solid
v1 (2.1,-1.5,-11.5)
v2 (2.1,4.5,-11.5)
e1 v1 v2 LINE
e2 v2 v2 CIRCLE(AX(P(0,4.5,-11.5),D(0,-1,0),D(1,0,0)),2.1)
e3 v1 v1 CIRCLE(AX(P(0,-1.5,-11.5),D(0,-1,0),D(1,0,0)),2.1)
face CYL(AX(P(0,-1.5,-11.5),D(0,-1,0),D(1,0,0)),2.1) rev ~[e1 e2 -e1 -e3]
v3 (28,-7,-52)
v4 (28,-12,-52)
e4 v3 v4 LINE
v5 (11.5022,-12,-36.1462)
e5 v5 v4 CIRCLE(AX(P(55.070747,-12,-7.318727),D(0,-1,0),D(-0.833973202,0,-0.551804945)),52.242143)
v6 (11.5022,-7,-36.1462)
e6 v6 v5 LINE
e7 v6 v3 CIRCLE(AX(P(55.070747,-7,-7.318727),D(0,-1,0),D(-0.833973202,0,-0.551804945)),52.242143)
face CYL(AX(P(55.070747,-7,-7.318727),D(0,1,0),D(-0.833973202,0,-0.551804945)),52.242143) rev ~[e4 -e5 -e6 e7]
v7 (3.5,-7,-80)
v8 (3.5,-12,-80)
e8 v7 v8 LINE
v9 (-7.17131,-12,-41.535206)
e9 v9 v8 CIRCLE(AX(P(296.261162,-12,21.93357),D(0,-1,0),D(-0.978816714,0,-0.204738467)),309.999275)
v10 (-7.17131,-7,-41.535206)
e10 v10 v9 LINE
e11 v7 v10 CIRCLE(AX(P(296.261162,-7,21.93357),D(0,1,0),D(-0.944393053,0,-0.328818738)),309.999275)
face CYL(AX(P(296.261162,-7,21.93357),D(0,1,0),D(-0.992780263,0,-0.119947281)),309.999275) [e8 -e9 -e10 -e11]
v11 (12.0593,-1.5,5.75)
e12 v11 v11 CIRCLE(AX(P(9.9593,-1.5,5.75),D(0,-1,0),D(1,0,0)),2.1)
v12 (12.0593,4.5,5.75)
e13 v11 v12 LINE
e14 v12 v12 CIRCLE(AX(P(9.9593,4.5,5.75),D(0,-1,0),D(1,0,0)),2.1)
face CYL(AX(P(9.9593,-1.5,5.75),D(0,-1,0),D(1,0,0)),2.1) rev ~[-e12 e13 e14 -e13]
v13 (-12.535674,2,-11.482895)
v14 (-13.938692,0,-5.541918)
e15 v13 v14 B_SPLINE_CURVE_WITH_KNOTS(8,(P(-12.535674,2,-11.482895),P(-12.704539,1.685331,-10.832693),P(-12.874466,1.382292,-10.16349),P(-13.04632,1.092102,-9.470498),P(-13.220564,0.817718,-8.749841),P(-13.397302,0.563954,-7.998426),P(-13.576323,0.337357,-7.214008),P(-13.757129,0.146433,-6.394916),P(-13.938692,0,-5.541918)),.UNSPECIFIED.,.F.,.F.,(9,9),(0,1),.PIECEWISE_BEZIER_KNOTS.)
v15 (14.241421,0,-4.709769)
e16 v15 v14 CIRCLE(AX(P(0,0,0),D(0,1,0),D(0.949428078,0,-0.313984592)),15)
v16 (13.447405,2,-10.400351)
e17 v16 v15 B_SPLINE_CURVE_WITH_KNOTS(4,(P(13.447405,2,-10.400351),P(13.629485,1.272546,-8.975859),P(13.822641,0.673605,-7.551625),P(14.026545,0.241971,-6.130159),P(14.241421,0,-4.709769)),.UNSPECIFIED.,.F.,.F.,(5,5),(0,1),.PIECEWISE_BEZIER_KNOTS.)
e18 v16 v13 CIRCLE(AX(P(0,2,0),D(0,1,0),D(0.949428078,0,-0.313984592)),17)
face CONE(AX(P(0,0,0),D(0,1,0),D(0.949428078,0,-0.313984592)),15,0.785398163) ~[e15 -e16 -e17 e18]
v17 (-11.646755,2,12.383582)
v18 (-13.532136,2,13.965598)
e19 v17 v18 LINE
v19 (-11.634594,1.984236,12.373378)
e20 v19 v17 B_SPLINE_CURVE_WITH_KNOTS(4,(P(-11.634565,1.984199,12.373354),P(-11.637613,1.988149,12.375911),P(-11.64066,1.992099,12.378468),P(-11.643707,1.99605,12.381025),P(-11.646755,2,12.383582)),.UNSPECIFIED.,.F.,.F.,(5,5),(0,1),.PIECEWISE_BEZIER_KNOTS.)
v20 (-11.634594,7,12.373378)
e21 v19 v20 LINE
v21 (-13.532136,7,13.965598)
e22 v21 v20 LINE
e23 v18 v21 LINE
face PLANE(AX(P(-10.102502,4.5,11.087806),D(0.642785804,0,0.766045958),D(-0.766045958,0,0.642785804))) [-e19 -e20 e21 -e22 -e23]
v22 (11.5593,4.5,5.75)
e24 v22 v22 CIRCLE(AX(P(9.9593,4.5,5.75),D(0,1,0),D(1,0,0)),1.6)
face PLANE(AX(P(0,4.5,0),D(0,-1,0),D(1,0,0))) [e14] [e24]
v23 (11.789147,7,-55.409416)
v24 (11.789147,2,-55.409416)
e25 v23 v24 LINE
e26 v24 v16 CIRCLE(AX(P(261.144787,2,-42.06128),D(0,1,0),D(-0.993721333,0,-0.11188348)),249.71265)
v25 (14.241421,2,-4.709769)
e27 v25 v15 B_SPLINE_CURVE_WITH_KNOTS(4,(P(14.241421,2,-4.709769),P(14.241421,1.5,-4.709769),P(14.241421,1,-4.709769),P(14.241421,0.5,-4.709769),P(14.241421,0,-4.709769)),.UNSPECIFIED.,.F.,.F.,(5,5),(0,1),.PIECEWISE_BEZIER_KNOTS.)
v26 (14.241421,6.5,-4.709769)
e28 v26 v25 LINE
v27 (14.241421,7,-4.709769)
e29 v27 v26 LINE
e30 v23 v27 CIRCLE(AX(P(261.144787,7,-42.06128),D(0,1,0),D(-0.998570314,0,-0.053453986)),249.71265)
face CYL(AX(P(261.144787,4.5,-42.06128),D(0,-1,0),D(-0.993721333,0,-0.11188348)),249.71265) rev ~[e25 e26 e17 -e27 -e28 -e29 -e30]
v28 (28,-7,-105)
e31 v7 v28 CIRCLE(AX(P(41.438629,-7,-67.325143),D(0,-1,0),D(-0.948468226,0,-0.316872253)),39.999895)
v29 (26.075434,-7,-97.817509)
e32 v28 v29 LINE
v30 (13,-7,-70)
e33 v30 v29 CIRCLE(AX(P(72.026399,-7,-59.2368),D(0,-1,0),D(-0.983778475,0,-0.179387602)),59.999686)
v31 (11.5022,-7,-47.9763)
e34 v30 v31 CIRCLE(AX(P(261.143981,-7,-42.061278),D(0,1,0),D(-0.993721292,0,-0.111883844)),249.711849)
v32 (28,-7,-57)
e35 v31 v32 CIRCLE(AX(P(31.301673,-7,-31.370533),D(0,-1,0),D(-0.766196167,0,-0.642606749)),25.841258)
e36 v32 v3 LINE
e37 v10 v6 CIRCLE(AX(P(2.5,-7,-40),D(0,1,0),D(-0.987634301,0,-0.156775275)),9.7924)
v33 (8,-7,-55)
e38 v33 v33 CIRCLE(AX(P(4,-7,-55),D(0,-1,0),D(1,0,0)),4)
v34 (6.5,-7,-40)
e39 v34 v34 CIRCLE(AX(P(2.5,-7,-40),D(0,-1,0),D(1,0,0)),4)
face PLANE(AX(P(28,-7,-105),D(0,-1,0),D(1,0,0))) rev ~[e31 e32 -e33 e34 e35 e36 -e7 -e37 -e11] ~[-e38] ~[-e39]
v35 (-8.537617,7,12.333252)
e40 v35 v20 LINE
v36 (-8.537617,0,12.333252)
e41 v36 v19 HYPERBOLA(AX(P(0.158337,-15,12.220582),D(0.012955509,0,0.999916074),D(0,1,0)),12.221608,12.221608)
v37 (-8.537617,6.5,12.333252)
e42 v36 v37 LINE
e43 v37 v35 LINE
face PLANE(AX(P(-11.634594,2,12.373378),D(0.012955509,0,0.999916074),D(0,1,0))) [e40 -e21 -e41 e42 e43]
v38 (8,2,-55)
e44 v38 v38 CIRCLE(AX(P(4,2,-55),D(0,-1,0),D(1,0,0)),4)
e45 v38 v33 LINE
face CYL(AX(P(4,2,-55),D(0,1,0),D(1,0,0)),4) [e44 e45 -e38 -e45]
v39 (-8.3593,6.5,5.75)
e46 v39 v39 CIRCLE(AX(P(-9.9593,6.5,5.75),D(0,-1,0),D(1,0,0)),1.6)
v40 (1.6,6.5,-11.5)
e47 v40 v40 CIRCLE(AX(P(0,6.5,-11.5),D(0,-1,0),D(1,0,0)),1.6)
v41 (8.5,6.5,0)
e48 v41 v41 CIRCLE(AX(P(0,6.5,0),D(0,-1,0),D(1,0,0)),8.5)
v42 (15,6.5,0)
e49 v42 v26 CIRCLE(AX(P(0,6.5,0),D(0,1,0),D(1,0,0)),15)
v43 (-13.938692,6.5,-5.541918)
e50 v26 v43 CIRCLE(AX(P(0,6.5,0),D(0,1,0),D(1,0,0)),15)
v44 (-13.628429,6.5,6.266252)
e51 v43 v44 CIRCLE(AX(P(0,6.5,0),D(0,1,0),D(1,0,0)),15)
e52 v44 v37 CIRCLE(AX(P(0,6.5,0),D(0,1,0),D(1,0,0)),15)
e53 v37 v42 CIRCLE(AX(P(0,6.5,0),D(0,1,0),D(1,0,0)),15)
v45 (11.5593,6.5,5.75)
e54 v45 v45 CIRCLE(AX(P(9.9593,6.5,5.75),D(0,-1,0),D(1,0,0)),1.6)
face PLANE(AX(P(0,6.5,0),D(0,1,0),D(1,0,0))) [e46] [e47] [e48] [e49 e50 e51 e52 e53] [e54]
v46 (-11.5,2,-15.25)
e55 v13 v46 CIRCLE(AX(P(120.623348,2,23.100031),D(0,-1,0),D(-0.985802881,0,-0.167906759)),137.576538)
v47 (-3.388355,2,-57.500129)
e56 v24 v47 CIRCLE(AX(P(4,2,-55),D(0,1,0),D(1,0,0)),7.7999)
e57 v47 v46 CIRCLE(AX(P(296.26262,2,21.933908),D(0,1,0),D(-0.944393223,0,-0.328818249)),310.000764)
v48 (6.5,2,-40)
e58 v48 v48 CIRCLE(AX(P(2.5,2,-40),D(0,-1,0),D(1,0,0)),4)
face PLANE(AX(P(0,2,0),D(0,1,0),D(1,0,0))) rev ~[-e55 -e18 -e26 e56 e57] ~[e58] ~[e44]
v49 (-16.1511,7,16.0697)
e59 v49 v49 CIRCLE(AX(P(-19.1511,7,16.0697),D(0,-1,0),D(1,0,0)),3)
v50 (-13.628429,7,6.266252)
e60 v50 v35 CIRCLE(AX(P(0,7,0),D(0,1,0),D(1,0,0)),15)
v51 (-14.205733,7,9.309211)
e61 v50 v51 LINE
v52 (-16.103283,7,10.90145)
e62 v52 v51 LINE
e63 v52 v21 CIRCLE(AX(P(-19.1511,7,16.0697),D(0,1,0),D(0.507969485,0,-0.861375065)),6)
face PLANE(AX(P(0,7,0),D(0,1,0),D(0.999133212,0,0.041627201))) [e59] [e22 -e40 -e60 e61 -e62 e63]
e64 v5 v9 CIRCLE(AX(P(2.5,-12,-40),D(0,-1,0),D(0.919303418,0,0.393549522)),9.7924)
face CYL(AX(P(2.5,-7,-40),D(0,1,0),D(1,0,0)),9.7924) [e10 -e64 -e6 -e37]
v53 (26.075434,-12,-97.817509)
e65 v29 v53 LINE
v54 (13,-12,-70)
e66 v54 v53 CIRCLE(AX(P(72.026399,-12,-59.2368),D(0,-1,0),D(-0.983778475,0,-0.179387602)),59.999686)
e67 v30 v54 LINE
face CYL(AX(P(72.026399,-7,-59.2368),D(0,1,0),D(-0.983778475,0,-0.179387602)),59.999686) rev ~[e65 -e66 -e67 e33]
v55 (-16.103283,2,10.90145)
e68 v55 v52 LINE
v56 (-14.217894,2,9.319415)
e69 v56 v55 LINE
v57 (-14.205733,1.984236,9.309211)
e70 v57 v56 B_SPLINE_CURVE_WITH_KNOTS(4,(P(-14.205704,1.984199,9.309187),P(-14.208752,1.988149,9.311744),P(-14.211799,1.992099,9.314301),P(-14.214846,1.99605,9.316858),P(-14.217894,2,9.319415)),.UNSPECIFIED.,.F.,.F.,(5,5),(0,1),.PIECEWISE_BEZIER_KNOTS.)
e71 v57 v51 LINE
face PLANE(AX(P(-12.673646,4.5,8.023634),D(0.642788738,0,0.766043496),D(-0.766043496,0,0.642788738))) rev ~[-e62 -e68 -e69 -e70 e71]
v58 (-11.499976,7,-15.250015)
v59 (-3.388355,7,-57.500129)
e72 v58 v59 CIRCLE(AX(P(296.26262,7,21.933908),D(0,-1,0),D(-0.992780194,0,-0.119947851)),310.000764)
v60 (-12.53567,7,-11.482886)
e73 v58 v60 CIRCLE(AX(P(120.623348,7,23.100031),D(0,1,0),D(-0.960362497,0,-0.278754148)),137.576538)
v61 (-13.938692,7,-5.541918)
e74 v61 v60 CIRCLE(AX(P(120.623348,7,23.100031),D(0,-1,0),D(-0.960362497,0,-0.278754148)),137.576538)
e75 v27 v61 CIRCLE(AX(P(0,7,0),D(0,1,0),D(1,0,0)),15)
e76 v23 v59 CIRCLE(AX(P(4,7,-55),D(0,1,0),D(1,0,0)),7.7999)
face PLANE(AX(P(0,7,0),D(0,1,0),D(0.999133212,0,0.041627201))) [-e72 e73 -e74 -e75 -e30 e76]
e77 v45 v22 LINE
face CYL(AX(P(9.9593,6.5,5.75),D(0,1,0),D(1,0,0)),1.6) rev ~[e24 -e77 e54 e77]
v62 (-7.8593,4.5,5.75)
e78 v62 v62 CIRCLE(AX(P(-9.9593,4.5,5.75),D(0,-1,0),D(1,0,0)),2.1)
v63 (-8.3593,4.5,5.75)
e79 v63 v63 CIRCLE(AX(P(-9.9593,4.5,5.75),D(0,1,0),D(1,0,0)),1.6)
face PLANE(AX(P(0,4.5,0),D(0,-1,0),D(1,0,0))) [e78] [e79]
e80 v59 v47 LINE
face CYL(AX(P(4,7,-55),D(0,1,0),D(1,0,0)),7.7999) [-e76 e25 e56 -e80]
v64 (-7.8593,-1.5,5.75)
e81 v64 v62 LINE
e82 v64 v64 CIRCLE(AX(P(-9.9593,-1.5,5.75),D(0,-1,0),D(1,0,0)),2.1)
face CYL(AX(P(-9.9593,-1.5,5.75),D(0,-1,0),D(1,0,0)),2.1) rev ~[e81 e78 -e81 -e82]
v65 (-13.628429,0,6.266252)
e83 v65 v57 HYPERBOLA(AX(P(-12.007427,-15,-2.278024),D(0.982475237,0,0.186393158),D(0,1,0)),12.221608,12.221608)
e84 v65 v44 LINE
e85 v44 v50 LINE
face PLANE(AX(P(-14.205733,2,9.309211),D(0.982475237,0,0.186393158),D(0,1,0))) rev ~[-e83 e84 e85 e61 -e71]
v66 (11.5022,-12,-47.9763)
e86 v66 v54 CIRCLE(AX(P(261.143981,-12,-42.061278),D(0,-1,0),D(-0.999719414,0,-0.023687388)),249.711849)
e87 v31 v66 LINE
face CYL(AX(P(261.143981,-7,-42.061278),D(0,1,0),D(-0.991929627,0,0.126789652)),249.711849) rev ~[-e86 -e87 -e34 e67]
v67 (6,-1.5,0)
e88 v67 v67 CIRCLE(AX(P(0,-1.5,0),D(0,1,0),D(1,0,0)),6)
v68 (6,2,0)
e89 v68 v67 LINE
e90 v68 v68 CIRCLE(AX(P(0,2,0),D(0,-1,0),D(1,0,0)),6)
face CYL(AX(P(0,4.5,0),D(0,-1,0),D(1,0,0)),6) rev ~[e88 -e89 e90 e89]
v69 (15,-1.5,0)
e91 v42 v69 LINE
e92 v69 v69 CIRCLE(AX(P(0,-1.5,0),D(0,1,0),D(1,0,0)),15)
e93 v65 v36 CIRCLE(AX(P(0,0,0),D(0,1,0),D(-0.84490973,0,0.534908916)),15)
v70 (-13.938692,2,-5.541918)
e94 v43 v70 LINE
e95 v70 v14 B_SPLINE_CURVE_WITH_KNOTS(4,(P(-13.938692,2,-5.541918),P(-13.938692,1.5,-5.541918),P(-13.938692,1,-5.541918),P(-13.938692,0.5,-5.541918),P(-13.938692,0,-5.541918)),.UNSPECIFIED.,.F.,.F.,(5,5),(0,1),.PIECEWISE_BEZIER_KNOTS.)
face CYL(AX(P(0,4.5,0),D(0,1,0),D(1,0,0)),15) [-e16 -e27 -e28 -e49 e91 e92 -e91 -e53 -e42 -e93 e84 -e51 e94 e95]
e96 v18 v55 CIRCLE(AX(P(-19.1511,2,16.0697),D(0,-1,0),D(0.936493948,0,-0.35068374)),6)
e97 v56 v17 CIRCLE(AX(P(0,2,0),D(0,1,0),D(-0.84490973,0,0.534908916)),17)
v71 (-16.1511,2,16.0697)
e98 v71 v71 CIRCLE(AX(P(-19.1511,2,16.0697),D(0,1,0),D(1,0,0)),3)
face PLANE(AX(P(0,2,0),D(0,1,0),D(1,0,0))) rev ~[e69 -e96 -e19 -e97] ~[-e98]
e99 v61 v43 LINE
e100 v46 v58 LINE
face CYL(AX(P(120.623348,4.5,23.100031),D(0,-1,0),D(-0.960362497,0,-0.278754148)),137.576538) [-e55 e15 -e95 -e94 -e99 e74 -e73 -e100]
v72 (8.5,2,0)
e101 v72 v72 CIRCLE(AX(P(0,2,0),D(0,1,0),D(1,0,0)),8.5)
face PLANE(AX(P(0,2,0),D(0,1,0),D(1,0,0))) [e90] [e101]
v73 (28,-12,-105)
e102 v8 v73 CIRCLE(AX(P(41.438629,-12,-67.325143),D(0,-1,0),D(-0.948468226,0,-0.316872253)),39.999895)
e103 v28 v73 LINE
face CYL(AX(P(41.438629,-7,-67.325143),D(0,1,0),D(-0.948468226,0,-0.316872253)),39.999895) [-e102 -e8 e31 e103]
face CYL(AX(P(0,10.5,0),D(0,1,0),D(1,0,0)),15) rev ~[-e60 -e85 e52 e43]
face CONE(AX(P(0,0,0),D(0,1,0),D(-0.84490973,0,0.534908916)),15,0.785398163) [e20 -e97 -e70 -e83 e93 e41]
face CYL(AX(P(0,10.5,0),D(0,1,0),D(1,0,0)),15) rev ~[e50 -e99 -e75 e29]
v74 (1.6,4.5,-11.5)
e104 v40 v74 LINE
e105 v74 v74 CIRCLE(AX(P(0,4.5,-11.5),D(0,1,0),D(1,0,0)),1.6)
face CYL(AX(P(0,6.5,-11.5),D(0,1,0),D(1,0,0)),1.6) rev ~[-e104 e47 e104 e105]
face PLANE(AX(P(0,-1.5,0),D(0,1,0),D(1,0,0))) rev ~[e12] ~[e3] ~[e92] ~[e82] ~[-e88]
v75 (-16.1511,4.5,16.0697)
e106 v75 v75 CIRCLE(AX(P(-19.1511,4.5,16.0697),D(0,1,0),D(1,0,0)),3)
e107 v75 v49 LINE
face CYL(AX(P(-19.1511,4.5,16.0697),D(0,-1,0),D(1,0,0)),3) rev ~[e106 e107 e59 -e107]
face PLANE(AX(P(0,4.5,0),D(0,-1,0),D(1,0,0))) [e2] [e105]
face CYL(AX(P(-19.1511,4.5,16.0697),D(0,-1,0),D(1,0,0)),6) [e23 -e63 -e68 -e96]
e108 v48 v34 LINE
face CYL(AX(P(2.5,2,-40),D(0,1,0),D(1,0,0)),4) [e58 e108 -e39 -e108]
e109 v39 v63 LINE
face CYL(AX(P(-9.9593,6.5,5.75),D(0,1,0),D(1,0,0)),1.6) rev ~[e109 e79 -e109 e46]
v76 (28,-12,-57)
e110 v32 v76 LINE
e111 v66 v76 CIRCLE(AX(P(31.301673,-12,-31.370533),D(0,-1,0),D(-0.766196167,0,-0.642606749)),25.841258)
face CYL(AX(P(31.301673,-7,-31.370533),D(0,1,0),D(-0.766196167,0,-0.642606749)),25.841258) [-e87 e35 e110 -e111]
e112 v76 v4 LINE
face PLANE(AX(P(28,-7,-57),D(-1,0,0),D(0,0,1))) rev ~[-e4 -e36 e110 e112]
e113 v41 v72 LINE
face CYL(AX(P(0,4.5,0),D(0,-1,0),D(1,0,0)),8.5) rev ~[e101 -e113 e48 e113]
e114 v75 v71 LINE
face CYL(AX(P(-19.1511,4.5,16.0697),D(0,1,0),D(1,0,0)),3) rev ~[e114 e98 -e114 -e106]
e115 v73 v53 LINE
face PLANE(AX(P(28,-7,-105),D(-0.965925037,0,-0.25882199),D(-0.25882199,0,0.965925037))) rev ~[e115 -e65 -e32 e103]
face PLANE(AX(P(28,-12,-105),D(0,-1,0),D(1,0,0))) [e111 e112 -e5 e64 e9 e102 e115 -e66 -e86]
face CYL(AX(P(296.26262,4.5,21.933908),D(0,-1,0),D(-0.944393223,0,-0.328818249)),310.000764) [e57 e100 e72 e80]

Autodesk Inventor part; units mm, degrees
sketch "Skizze10" plane through (0, 0, 0) normal (1, 0, 0) x (0, 1, 0)
  line L0 (-1.4, 0) -> (8.4, 0) projected
  line L1 (0, -13.2) -> (0, 2.2) projected
  line L2 (2, -2.5) -> (7, -2.5)
  line L3 (7, -2.5) -> (7, -8)
  line L4 (7, -8) -> (2, -8)
  line L5 (2, -8) -> (2, -2.5)
  point P0 (0, 0)
  point P1 (0, -11)
  dimension "d135" = 8
  dimension "d137" = 5
  dimension "d138" = 2
  dimension "d145" = 2.5
revolve "Umdrehung2" add sketch "Skizze10" angle 360 about axis through (0, -10, 0) along (0, 1, 0)
ref_plane "Arbeitsebene2" through (0, 6, 0) normal (0, 1, 0) x (1, 0, 0)
ref_plane "Arbeitsebene3" through (0, 4.5, 0) normal (0, 1, 0) x (1, 0, 0)
sketch "Skizze12" plane through (0, 4.5, 0) normal (0, 1, 0) x (1, 0, 0)
  arc A0 (3.5, 80) -> (-11.5, 15.25) centre (296.2619, -21.9337) ccw projected
  arc A1 (28, 100) -> (13, 70) centre (72.0267, 59.2367) ccw projected
  line L0 (28, 100) -> (28, 105) projected
  arc A2 (28, 105) -> (3.5, 80) centre (41.4387, 67.3251) ccw projected
  circle A3 centre (0, 0) radius 15
  arc A4 (13, 70) -> (15, 0) centre (261.1443, 42.0613) ccw
  arc A5 (-11.5, 15.25) -> (-15, 0) centre (120.624, -23.1002) ccw
  circle A6 centre (0, 0) radius 8 projected
  line L1 (0, 0) -> (-19.1511, -16.0697)
  line L2 (-78.9324, 0) -> (358.7942, 0) projected
  line L3 (0, 133.8507) -> (0, -48.3491) projected
  circle A7 centre (-19.1511, -16.0697) radius 6
  circle A8 centre (-19.1511, -16.0697) radius 3
  line L4 (1.2856, -1.5321) -> (-14.0353, -14.3878)
  line L5 (-1.2856, 1.5321) -> (-16.6065, -11.3237)
  point P0 (-16.4, 0)
  point P1 (-12.6736, -8.0236)
  point P2 (-16.1033, -10.9014)
  point P3 (-13.5321, -13.9656)
  point P4 (-10.1025, -11.0878)
  dimension "d147" = 30
  dimension "d148" = 50
  dimension "d149" = 25
  dimension "d150" = 12
  dimension "d152" = 3
  dimension "d153" = 2
  dimension "d154" = 2
sketch "Skizze13" plane through (0, 4.5, 0) normal (0, 1, 0) x (1, 0, 0)
  point P0 (0, 0)
extrude "Extrusion8" add sketch "Skizze12" along normal mid plane 5 contours A2 L0 A1 A4 A3 L3 A0 | L3 A3 A5 A0 | L3 A6 L2 A5 A3 | A3 A4 L2 A6 L3 | L3 L2 A6 | A6 L2 L3 | L2 A6 L5 A3 | A3 L3 A6 L2 | A6 L3 L2 | L2 L5 A6 | L3 L4 A6 L1 | L1 A6 L5 L2 | L5 A6 L1 A3 | A3 L1 A7 L5 | A3 L4 A6 L3 | A6 L4 L3 | A6 L4 A3 L1 | A3 L4 A7 L1 | A7
sketch "Skizze14" plane through (0, 4.5, 0) normal (0, 1, 0) x (1, 0, 0)
  circle A0 centre (0, 0) radius 2.5
  dimension "d157" = 5
extrude "Extrusion9" cut sketch "Skizze14" along normal mid plane 20
sketch "Skizze15" plane through (0, 4.5, 0) normal (0, 1, 0) x (1, 0, 0)
  arc A0 (-11.5, 15.25) -> (-15, 0) centre (120.624, -23.1002) ccw projected
  circle A1 centre (0, 0) radius 15
extrude "Extrusion10" add sketch "Skizze15" along normal mid plane 12
sketch "Skizze16" plane through (0, 4.5, 0) normal (0, 1, 0) x (1, 0, 0)
  circle A0 centre (0, 0) radius 6
  dimension "d162" = 12
extrude "Extrusion11" cut sketch "Skizze16" along normal mid plane 12
sketch "Skizze17" plane through (0, 4.5, 0) normal (0, 1, 0) x (1, 0, 0)
  circle A0 centre (0, 0) radius 8.5
  dimension "d165" = 17
extrude "Extrusion12" cut sketch "Skizze17" along normal mid plane 5
chamfer "Fasen7" distance 2 angle 45 8 edges at (-11.4907, 7, 9.6418) (-10.1025, 5.75, 11.0878) (-10.1025, 3.25, 11.0878) (-11.4907, 2, 9.6418) (0.4428, 2, -14.9935) (0.4428, 7, -14.9935) (-12.6736, 5.75, 8.0236) (-12.6736, 3.25, 8.0236)
sketch "Skizze18" plane through (28, 2, -105) normal (0, -1, 0) x (1, 0, 0)
  point P0 (-28, 105)
ref_plane "Arbeitsebene4" through (28, -7, -105) normal (0, -1, 0) x (1, 0, 0)
sketch "Skizze20" plane through (28, 2, -105) normal (0, -1, 0) x (1, 0, 0)
  circle A0 centre (-24, 50) radius 4
  circle A1 centre (-25.5, 65) radius 4
  point P0 (-28, 105)
  dimension "d188" = 8
  dimension "d189" = 8
  dimension "d192" = 1.5
  dimension "d193" = 15
extrude "Extrusion14" add sketch "Skizze20" along normal blind 9
sketch "Skizze19" plane through (28, -7, -105) normal (0, -1, 0) x (1, 0, 0)
  arc A0 (-24.5, 25) -> (0, 0) centre (13.4387, 37.6749) ccw projected
  arc A1 (-15, 35) -> (0, 5) centre (44.0267, 45.7633) ccw projected
  line L0 (0, 0) -> (0, 5) projected
  line L1 (-15, 35) -> (-24.5, 25)
  arc A2 (-39.5, 89.75) -> (-24.5, 25) centre (268.2619, 126.9337) ccw projected
  arc A3 (-14.5526, 94.5996) -> (-15, 35) centre (233.1443, 62.9387) ccw projected
  line L2 (-27, 80) -> (3, 80) construction
  line L3 (-27, 80) -> (-7, 80) construction
  line L4 (-27, 82.5) -> (-5.7868, 82.5) construction
  circle A4 centre (-27, 80) radius 4 projected
  circle A5 centre (-27, 80) radius 4 projected
  circle A6 centre (-27, 60) radius 2.5 projected
  circle A7 centre (-27, 60) radius 2.5 projected
  circle A8 centre (-25.5, 65) radius 4 projected
  circle A9 centre (-25.5, 65) radius 9.7924
  arc A10 (-24.5, 73) -> (-16.5398, 59.1931) centre (13.4387, 85.6749) ccw
  line L5 (0, 48) -> (0, 53)
  line L6 (-28, -28.8006) -> (-28, 153.0481) projected
  line L7 (-117.4337, 105) -> (332.5445, 105) projected
  line L8 (0, 0) -> (0, 105)
  line L9 (0, 105) -> (0, 48)
  line L10 (0, 48) -> (-45.6316, 48)
  arc A11 (-16.4978, 68.8538) -> (0, 53) centre (27.0703, 97.6809) ccw
  arc A12 (-16.4978, 57.0237) -> (0, 48) centre (3.3017, 73.6295) ccw
  line L11 (0, 0) -> (-3.8553, 14.388)
  point P0 (-28, 105)
  point P1 (-16.5679, 62.8977)
  point P2 (-37.8031, 77.6969)
  point P3 (-16.4978, 68.8538)
  point P4 (-35.1713, 63.4649)
  point P5 (-15.4874, 86.1429)
  point P6 (-16.5398, 59.1931)
  point P7 (-1.9245, 7.1825)
  dimension "d213" = 57
  dimension "d214" = 15
extrude "Extrusion13" add sketch "Skizze19" along normal blind 5 contours L1 A1 L11 A0 | A2 L6 L10 A3 L1 | A2 L10 L6 | L10 L6 A9 A10 A3 | A2 A9 L6 L10 | A12 A3 A9 A11 L5 | A2 A9 L6 A8 A6 | L6 A6 A8 A9 A3 | A10 A9 A3 | L6 A8 A6 | A6 A8 L6 | A9 A3 | A8 L6 A6 | A6 L6 A8 | L6 A6 A8 | A8 A6 L6
sketch "Skizze21" plane through (28, 7, -100) normal (0, 1, 0) x (1, 0, 0)
  circle A0 centre (-24, -45) radius 4 projected
  circle A1 centre (-25.5, -60) radius 4 projected
  circle A2 centre (-27, -75) radius 4 projected
  circle A3 centre (-24, -45) radius 7.7999
  arc A4 (-14.5526, -89.5996) -> (-40.5357, -88.5171) centre (-28, -100) ccw projected
  arc A5 (-15, -30) -> (-14.5526, -89.5996) centre (233.1443, -57.9387) ccw projected
  arc A6 (0, 0) -> (-15, -30) centre (44.0267, -40.7633) ccw projected
  line L0 (0, 0) -> (0, 5) projected
  arc A7 (0, 5) -> (-24.5, -20) centre (13.4387, -32.6749) ccw projected
  arc A8 (-24.5, -20) -> (-39.5, -84.75) centre (268.2619, -121.9337) ccw projected
  arc A9 (-39.5, -84.75) -> (-40.5357, -88.5171) centre (92.624, -123.1002) ccw projected
  point P0 (-31.3884, -42.5)
  point P1 (-16.2109, -44.5906)
extrude "Extrusion15" cut sketch "Skizze21" against normal blind 5 contours A3 A8 A7 L0 A6 A5
sketch "Skizze22" plane through (0, 10.5, 0) normal (0, 1, 0) x (1, 0, 0)
  circle A0 centre (0, 0) radius 15
extrude "Extrusion16" cut sketch "Skizze22" against normal blind 4
sketch "Skizze23" plane through (0, 6.5, 0) normal (0, 1, 0) x (1, 0, 0)
  circle A0 centre (0, 0) radius 11.5
  circle A1 centre (0, 0) radius 8.5 projected
  arc A2 (-8.5376, -12.3333) -> (14.2414, 4.7098) centre (0, 0) ccw projected
  arc A3 (14.2414, 4.7098) -> (-13.9387, 5.5419) centre (0, 0) ccw projected
  arc A4 (-13.9387, 5.5419) -> (-13.6284, -6.2663) centre (0, 0) ccw projected
  arc A5 (-13.6284, -6.2663) -> (-8.5376, -12.3333) centre (0, 0) ccw projected
  line L0 (0, 0) -> (0, 30.1183)
  line L1 (0, 0) -> (-26.0832, -15.0591)
  line L2 (0, 0) -> (26.0832, -15.0591)
  circle A6 centre (-9.9593, -5.75) radius 1.6
  circle A7 centre (9.9593, -5.75) radius 1.6
  circle A8 centre (0, 11.5) radius 1.6
  dimension "d198" = 3
  dimension "d201" = 360
  dimension "d203" = 3.2
  dimension "d204" = 3.2
  dimension "d205" = 3.2
  dimension "d210" = 23
extrude "Extrusion17" cut sketch "Skizze23" against normal blind 8 contours A8 L0 A0 | A0 L0 A8 | A7 L2 A0 | A0 L2 A7 | L0 A8 A0 | A0 A8 L0 | L2 A7 A0 | A0 A7 L2 | A6 L1 A0 | A0 L1 A6 | A6 L1 A0 | A0 L1 A6
sketch "Skizze24" plane through (0, 7, 0) normal (0, 1, 0) x (0.9991332, 0, 0.0416272)
  arc A0 (-5.779, 57.3091) -> (-12.1248, 14.7581) centre (296.9181, -9.5822) ccw projected
  arc A1 (-12.1248, 14.7581) -> (-13.0028, 10.9511) centre (121.481, -18.0589) ccw projected
  arc A2 (13.0028, 10.9511) -> (-13.0028, 10.9511) centre (0, 0) ccw projected
  arc A3 (9.4724, 55.8521) -> (13.0028, 10.9511) centre (259.167, 52.8955) ccw projected
  line L0 (41.2501, 29.7308) -> (-28.4254, 29.7308)
  line L1 (-28.4254, 29.7308) -> (-28.4254, -36.8887)
  line L2 (-28.4254, -36.8887) -> (41.2501, -36.8887)
  line L3 (41.2501, -36.8887) -> (41.2501, 29.7308)
  point P0 (-10.579, 29.7308)
  point P1 (10.5316, 29.7308)
extrude "Extrusion18" cut sketch "Skizze24" along normal blind 5 contours A0 A1 A2 A3 L0 L3 L2 L1
sketch "Skizze26" plane through (0, -1.5, 0) normal (0, -1, 0) x (1, 0, 0)
  circle A0 centre (0, -11.5) radius 1.6 projected
  circle A1 centre (9.9593, 5.75) radius 1.6 projected
  circle A2 centre (-9.9593, 5.75) radius 1.6 projected
  circle A3 centre (-9.9593, 5.75) radius 2.1
  circle A4 centre (9.9593, 5.75) radius 2.1
  circle A5 centre (0, -11.5) radius 2.1
  dimension "d215" = 4.2
  dimension "d216" = 4.2
  dimension "d217" = 4.2
extrude "Extrusion19" cut sketch "Skizze26" against normal blind 6 contours A0 | A1 | A2 | A3 | A4 | A5
properties part number "01-03-01 Zange links nue" material "Phenolharz"
